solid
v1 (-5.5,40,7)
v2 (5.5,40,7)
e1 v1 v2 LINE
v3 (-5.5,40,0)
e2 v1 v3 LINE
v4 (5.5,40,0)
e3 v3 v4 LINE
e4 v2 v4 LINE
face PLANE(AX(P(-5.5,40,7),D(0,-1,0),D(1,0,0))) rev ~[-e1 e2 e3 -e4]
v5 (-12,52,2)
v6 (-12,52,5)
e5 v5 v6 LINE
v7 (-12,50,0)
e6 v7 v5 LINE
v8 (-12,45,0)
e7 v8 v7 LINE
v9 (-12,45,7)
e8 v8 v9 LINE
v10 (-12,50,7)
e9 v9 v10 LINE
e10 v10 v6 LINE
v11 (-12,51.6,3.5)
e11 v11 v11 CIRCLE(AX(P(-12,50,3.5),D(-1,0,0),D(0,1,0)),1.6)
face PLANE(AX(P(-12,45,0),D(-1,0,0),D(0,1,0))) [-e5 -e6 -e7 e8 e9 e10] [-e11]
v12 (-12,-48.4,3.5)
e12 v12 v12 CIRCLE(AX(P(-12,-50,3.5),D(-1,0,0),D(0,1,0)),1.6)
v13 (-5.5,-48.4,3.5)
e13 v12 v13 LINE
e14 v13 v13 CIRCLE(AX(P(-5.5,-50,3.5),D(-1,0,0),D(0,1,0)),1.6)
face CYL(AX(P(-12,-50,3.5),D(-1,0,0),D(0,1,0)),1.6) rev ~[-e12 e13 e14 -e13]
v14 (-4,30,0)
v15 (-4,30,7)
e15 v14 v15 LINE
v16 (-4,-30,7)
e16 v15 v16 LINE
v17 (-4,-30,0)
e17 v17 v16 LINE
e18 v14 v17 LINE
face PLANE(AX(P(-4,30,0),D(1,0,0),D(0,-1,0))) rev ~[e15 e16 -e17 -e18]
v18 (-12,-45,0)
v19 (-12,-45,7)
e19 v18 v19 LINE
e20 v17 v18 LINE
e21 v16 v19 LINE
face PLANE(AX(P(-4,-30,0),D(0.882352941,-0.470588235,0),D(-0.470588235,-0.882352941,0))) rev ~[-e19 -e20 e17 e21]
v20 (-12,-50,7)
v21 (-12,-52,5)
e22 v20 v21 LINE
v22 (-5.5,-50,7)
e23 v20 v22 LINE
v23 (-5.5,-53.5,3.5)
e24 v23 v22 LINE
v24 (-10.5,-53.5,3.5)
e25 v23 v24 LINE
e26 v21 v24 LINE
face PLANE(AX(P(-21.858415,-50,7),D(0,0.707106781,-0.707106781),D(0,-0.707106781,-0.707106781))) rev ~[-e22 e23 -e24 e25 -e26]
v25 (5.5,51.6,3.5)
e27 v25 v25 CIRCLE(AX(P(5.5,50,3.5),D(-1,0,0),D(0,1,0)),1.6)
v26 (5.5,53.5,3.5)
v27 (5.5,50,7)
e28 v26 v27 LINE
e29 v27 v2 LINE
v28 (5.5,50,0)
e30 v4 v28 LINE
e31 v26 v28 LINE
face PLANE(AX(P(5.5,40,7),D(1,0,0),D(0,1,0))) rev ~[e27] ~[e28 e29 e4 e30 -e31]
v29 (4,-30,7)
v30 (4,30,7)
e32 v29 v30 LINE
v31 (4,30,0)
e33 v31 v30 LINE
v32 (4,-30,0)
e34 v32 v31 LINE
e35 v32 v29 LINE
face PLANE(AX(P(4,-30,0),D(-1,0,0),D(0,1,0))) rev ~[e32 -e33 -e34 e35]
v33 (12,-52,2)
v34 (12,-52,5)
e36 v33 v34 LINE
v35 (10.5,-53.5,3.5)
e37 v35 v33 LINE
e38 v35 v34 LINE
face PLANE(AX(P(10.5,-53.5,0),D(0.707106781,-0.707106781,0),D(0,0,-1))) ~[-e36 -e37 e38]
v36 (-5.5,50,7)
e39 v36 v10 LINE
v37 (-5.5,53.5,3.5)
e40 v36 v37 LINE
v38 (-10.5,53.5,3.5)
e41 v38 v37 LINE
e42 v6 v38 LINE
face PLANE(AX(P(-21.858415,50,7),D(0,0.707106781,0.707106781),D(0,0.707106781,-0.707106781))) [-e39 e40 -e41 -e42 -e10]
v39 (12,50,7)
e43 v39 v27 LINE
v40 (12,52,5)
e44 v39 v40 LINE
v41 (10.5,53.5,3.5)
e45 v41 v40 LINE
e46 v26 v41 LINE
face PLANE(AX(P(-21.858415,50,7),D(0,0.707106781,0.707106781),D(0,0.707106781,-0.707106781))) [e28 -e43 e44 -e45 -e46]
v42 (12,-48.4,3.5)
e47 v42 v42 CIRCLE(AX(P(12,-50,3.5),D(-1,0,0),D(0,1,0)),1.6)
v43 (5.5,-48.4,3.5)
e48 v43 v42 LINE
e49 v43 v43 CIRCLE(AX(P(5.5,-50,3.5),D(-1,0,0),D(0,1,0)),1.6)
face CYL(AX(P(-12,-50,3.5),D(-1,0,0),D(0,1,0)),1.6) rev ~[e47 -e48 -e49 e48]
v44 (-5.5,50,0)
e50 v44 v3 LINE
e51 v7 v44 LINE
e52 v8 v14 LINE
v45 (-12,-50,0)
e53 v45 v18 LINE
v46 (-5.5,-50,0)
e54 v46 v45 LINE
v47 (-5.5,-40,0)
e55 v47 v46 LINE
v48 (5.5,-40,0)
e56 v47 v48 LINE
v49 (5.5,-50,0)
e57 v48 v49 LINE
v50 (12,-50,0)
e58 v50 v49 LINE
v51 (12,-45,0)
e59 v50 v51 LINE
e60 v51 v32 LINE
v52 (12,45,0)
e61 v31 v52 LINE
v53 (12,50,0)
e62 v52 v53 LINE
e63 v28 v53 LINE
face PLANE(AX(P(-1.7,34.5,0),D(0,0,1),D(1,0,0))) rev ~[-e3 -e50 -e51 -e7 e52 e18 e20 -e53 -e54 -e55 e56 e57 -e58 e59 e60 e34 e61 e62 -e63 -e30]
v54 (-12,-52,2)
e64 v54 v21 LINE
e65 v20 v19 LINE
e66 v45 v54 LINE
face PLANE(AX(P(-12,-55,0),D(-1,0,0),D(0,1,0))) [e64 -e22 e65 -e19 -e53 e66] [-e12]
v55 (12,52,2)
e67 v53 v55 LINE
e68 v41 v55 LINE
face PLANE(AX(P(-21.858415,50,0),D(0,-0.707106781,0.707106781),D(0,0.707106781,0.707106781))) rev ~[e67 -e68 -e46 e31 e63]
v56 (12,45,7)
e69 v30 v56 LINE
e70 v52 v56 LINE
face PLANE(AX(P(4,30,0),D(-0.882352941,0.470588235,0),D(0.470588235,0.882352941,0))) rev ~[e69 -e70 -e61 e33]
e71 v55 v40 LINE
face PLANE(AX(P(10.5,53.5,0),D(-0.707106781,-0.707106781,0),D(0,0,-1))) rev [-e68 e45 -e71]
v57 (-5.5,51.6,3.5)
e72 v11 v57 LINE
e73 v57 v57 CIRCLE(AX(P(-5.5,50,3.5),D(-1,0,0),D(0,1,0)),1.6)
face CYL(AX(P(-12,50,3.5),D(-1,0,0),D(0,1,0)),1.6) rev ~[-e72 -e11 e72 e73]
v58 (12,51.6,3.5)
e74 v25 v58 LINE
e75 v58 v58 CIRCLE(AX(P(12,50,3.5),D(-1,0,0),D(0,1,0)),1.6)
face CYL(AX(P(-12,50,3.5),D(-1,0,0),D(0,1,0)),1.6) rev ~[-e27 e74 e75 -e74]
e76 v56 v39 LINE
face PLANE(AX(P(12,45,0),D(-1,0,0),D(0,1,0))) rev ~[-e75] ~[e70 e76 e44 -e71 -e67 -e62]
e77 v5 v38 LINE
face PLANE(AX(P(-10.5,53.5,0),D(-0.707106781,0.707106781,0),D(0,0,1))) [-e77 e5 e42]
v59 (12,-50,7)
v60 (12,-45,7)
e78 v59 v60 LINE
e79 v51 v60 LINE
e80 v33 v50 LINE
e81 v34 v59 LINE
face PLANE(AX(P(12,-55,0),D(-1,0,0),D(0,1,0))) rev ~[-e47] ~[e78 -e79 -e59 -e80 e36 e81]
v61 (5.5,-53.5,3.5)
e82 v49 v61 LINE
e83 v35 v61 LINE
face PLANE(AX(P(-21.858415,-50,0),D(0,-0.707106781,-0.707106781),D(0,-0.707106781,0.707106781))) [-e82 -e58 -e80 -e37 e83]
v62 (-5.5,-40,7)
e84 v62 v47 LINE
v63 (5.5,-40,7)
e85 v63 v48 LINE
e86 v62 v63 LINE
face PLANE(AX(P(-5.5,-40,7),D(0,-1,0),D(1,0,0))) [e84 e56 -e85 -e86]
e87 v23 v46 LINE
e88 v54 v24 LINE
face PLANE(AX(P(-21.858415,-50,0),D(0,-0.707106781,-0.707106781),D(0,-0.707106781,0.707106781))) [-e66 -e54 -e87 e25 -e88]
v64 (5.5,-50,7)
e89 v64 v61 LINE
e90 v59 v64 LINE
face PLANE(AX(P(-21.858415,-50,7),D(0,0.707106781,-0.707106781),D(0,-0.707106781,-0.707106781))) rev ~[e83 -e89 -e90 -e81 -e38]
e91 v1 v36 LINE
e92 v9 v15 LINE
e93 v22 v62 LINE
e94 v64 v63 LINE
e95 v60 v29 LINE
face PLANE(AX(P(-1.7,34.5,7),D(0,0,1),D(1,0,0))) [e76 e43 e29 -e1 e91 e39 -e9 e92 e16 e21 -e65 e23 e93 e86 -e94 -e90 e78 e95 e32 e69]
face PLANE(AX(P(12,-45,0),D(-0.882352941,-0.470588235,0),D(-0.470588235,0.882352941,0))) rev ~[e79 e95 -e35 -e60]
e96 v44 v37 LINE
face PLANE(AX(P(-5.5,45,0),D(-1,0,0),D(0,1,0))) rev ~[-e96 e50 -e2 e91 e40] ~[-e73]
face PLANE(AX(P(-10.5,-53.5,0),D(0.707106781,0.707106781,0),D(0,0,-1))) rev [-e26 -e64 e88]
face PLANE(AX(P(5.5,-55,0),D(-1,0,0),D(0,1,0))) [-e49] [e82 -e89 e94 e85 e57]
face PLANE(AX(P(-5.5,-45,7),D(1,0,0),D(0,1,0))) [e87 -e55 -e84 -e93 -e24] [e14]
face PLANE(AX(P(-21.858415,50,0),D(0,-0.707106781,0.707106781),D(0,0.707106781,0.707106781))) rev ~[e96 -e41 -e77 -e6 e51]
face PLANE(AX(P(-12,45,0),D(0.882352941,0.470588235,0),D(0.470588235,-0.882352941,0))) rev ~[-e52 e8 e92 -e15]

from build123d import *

# Parameters (mm, degrees)
F0_W        = 6.5
F0_H        = 10
F1_DEPTH    = 7
F3_DEPTH    = 25
F4_W        = 11
F4_H        = 5
F5_DEPTH    = 25
F6_SIZE     = 3
F7_T1_DEPTH = 29.2168298797
F7_T3_DEPTH = 29.2168298797


# Not quite as in the source:
# - a fillet or chamfer that OpenCascade refuses, or shapes differently, is made with other operations: its cross-section is extruded or revolved along the edge and cut away or added
# - a feature names something its author has since deleted; it is built from what else it names


with BuildPart() as f1:
    # F0 (on Top) → F1 (new body)
    with BuildSketch(Plane.XY):
        Polygon((0, 45), (-4, 45), (-4, 30), (0, 22.5), align=None)
        Polygon((4, 45), (0, 45), (0, 22.5), (4, 30), align=None)
        Polygon((-4, 30), (-4, 45), (-5.5, 45), (-12, 45), align=None)
        Polygon((0, -22.5), (-4, -30), (-4, -45), (0, -45), align=None)
        Polygon((4, -30), (0, -22.5), (0, -45), (4, -45), align=None)
        Polygon((12, -45), (4, -30), (4, -45), (5.5, -45), align=None)
        Polygon((-4, -45), (-4, -30), (-12, -45), (-5.5, -45), align=None)
        Polygon((5.5, 45), (4, 45), (4, 30), (12, 45), align=None)
        Polygon((0, 22.5), (-4, 30), (-4, -30), (0, -22.5), (0, 0), align=None)
        Polygon((4, 30), (0, 22.5), (0, 0), (0, -22.5), (4, -30), align=None)
        with Locations((8.75, 50)):
            Rectangle(F0_W, F0_H)
        with Locations((-8.75, 50)):
            Rectangle(F0_W, F0_H)
        with Locations((8.75, -50)):
            Rectangle(F0_W, F0_H)
        with Locations((-8.75, -50)):
            Rectangle(F0_W, F0_H)
    extrude(amount=F1_DEPTH)

    # F2 (on face) → F3 (cut)
    with BuildSketch(Plane(origin=(-12, 0, 0), x_dir=(0, -1, 0), z_dir=(-1, 0, 0))):
        with BuildLine():
            ThreePointArc((-48.4, 3.5), (-50, 5.1), (-51.6, 3.5))
            Line((-51.6, 3.5), (-50, 3.5))
            Line((-50, 3.5), (-48.4, 3.5))
        make_face()
        with BuildLine():
            Line((-50, 3.5), (-51.6, 3.5))
            ThreePointArc((-51.6, 3.5), (-50, 1.9), (-48.4, 3.5))
            Line((-48.4, 3.5), (-50, 3.5))
        make_face()
        with BuildLine():
            ThreePointArc((51.6, 3.5), (50, 5.1), (48.4, 3.5))
            ThreePointArc((48.4, 3.5), (50, 1.9), (51.6, 3.5))
        make_face()
    extrude(amount=-F3_DEPTH, mode=Mode.SUBTRACT)

    # F4 (on face) → F5 (cut)
    with BuildSketch(Plane.XY.offset(7)):
        with Locations((0, -42.5)):
            Rectangle(F4_W, F4_H)
        with Locations((0, 42.5)):
            Rectangle(F4_W, F4_H)
    extrude(amount=-F5_DEPTH, mode=Mode.SUBTRACT)

    # F6
    f6_edges = [f1.edges().sort_by_distance(p)[0] for p in [
        (12, -55, 3.5),
        (-12, -55, 3.5),
        (12, 55, 3.5),
        (-12, 55, 3.5),
    ]]
    chamfer(f6_edges, length=F6_SIZE)

    # F7: chamfer of 5 on 8 edges, made by hand

    # F7_s2 → F7_t1 (cut)
    with BuildSketch(Plane.YZ.offset(-21.8584149398)):
        Polygon((-50, 0), (-55, 5), (-55, 0), align=None)
        Polygon((-50, 7), (-55, 2), (-55, 7), align=None)
        Polygon((50, 7), (55, 2), (55, 7), align=None)
        Polygon((50, 0), (55, 5), (55, 0), align=None)
    extrude(amount=F7_T1_DEPTH, mode=Mode.SUBTRACT)

    # F7_s4 → F7_t3 (cut)
    with BuildSketch(Plane.YZ.offset(-7.3584149398)):
        Polygon((-55, 5), (-50, 0), (-55, 0), align=None)
        Polygon((-55, 2), (-50, 7), (-55, 7), align=None)
        Polygon((50, 7), (55, 2), (55, 7), align=None)
        Polygon((50, 0), (55, 5), (55, 0), align=None)
    extrude(amount=F7_T3_DEPTH, mode=Mode.SUBTRACT)


solid = f1.part
